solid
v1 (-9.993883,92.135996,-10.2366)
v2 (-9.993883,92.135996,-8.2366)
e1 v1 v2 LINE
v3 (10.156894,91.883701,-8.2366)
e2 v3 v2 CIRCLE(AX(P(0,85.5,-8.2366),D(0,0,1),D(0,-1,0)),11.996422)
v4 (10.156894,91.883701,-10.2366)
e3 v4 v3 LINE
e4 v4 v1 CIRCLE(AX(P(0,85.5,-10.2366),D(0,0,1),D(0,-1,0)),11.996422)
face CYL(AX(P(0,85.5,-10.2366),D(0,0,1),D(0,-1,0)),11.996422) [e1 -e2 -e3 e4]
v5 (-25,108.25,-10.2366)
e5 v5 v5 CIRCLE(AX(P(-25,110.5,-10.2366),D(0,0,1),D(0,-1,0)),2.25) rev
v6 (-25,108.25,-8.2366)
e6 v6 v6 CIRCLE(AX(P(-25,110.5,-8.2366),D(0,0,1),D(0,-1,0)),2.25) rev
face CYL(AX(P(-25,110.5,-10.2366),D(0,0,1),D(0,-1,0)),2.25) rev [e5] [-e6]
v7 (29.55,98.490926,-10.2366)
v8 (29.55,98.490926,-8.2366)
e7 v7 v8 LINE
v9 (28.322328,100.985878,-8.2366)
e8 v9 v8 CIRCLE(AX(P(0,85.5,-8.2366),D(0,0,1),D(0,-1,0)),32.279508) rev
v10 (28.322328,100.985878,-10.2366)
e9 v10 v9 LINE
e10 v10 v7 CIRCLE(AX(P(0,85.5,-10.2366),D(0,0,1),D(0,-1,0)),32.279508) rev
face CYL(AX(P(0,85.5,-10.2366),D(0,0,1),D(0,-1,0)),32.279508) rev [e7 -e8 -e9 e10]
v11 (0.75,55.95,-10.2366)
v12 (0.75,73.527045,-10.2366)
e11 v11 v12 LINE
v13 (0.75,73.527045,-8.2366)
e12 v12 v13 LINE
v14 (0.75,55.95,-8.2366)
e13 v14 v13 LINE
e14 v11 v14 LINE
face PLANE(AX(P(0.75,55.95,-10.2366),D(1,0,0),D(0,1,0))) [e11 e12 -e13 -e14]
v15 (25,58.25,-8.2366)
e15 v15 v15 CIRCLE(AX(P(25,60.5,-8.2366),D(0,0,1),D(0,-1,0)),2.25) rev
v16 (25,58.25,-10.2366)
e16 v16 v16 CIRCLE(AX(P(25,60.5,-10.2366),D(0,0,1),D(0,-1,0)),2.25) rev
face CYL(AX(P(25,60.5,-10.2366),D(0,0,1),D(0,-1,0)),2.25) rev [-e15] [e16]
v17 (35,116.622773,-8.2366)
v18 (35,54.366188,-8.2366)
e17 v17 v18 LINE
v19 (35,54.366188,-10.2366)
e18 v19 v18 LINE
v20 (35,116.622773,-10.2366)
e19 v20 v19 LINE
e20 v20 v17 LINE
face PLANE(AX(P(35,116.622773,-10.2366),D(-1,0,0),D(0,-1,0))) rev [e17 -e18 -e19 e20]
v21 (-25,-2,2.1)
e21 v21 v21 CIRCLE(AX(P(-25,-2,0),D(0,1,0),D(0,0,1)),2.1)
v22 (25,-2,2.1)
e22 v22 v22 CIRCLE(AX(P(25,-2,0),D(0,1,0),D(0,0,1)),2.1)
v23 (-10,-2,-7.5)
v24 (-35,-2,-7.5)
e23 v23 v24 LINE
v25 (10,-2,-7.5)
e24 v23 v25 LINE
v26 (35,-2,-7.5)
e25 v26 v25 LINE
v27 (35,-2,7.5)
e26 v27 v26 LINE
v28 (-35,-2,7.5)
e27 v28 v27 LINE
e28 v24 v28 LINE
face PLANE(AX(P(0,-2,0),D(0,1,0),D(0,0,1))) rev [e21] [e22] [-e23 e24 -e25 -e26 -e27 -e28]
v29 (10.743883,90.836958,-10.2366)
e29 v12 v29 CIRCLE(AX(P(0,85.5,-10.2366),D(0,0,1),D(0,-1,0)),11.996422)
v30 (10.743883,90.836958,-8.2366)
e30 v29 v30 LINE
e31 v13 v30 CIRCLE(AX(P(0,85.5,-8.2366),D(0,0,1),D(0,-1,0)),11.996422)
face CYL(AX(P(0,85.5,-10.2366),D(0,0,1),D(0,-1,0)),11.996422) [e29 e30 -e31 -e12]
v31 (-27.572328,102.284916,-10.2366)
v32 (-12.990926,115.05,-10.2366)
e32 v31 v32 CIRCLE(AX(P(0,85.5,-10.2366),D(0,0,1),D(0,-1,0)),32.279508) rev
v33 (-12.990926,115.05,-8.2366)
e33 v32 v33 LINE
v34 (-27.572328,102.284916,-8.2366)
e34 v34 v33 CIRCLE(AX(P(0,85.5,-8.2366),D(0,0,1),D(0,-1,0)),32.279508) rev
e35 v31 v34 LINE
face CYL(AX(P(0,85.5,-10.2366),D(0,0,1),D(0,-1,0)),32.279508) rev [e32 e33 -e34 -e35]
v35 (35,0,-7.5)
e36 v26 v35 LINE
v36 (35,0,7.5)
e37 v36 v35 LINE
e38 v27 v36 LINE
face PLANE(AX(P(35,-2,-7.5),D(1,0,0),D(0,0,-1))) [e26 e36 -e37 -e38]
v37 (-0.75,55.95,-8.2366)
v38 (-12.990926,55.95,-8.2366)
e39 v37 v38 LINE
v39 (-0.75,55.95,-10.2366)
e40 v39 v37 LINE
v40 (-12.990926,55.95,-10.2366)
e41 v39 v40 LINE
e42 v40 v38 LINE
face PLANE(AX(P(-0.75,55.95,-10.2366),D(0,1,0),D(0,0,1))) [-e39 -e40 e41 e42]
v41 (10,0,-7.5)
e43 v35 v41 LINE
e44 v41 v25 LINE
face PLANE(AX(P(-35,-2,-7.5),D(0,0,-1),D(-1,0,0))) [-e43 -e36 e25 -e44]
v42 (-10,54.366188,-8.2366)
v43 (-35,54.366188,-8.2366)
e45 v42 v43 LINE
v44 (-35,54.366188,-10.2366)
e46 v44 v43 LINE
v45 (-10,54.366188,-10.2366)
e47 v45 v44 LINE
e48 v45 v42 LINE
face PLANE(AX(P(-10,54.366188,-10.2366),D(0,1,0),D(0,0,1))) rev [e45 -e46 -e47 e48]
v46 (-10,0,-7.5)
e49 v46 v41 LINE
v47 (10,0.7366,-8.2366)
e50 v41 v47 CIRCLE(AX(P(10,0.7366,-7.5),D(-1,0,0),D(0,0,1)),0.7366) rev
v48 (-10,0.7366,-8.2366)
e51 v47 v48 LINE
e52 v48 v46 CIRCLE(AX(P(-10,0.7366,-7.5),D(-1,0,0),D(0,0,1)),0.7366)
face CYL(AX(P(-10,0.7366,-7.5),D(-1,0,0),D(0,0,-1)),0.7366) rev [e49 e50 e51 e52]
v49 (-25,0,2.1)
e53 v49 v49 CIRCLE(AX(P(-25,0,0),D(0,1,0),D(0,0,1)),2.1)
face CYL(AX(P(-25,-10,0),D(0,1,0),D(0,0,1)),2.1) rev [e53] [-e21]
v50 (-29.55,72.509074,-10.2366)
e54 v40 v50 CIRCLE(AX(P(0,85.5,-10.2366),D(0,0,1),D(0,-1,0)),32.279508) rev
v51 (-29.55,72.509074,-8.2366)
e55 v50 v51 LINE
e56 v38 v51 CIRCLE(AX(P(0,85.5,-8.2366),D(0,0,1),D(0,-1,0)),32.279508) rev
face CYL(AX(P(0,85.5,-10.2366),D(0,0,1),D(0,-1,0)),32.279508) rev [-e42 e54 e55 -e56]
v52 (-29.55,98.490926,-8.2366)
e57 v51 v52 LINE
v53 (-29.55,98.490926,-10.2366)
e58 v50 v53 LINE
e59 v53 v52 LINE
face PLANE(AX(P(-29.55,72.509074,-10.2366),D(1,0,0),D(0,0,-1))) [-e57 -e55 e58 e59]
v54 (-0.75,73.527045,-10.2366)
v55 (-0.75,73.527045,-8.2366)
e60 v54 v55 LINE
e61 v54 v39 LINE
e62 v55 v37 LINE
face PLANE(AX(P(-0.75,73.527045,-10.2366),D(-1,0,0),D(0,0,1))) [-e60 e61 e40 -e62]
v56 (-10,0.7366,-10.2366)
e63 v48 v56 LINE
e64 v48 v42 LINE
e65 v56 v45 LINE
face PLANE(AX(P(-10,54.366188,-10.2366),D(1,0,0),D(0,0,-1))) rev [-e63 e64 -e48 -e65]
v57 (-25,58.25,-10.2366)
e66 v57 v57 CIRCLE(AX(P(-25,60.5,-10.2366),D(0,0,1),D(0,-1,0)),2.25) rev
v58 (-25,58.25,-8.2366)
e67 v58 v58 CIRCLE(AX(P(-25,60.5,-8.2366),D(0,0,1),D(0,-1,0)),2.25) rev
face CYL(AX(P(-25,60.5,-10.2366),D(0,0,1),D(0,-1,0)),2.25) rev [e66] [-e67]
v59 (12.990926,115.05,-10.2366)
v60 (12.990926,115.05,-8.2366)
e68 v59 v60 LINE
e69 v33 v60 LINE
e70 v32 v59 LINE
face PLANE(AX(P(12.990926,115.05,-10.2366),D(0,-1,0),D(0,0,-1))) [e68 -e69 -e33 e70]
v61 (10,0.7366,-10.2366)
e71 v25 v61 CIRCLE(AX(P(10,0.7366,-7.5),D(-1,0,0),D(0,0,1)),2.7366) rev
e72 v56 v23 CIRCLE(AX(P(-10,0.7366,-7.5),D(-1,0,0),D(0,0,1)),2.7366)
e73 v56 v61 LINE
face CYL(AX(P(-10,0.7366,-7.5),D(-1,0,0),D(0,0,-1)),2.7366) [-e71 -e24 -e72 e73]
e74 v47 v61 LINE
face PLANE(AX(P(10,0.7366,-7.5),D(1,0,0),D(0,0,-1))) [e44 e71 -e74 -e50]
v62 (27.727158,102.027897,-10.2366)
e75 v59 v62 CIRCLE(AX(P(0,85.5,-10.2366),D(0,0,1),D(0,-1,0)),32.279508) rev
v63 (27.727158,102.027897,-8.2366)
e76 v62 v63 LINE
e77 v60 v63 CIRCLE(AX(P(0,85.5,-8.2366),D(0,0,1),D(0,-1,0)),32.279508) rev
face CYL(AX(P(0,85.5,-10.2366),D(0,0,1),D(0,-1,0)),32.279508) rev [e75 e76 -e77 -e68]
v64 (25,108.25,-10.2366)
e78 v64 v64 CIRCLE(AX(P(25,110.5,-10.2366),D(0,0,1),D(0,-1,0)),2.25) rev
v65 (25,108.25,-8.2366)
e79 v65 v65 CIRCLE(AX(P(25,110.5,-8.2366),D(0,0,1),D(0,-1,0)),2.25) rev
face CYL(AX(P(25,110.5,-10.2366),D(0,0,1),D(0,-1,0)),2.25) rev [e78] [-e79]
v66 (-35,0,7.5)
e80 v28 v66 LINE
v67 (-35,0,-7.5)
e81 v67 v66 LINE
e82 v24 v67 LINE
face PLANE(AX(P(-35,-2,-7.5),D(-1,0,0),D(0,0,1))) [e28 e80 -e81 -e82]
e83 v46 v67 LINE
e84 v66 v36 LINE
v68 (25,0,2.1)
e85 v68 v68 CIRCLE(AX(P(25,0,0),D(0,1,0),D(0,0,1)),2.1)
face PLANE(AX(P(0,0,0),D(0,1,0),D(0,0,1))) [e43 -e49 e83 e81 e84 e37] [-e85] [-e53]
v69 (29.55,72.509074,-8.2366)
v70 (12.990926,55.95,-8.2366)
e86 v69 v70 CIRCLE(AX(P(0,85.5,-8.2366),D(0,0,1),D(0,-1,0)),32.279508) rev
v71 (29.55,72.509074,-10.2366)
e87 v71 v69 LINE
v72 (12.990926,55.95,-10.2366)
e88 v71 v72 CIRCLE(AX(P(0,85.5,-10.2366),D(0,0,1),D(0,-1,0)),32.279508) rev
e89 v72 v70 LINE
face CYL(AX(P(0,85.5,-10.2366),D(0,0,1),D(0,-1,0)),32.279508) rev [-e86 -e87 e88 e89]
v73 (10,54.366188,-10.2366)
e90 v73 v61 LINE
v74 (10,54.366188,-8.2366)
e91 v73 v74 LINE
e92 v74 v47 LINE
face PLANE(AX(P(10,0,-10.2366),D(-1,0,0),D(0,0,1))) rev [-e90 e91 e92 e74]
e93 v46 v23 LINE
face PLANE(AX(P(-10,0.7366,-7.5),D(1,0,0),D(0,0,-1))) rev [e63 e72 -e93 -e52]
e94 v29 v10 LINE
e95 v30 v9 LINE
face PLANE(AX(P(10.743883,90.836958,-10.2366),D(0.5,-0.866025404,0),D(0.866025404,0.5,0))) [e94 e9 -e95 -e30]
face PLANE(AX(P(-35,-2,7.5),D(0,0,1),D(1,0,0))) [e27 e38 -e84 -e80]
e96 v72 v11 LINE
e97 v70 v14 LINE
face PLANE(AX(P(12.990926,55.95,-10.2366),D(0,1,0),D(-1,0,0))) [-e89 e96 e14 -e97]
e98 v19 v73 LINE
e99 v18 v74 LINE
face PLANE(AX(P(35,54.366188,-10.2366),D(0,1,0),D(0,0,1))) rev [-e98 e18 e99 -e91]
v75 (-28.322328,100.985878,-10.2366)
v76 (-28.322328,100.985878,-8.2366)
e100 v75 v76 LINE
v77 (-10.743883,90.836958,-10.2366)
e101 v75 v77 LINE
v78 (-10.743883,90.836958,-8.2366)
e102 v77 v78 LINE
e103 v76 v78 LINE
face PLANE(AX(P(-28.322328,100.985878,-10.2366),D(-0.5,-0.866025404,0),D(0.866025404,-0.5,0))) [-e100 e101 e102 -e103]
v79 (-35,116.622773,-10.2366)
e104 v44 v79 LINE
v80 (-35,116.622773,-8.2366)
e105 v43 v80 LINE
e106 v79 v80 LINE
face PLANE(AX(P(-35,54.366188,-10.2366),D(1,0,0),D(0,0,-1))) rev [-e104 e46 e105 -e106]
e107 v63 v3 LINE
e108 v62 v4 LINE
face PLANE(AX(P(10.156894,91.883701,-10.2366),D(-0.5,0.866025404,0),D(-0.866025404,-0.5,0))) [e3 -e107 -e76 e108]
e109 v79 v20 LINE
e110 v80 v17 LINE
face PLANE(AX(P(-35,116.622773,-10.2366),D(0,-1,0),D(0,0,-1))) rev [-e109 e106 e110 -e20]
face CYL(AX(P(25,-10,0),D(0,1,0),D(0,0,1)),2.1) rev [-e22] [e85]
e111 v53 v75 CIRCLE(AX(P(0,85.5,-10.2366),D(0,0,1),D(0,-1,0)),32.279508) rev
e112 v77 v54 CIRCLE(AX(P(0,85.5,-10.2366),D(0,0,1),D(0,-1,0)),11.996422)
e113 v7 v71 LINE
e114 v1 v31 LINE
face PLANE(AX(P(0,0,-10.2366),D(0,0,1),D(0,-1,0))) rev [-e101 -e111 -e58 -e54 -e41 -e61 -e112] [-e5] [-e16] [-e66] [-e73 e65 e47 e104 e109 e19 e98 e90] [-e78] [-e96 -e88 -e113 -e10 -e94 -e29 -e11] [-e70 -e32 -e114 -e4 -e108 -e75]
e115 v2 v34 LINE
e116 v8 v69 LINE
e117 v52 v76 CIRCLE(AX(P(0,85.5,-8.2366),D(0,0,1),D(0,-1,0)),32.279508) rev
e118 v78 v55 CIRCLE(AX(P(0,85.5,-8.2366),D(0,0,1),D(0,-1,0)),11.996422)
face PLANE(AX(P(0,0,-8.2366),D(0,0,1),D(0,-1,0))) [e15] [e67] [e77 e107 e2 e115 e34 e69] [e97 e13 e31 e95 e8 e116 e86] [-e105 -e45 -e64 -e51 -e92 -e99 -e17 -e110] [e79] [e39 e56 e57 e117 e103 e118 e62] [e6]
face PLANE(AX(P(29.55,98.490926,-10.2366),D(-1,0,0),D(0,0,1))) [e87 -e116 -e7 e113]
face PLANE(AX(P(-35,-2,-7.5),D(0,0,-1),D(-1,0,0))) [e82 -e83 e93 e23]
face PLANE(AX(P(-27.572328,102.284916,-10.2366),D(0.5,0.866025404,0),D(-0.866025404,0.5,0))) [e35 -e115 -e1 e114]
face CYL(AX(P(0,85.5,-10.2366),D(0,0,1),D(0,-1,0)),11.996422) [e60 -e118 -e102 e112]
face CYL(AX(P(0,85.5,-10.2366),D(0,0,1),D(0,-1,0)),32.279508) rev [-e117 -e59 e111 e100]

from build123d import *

# Parameters (mm, degrees)
SKETCH1_W               = 70
SKETCH1_H               = 15
BASE_FLANGE1_DEPTH      = 2
EDGE_FLANGE1_DEPTH      = 20
EDGE_FLANGE1_START      = 2
EDGE_FLANGE1_PROFILE_R  = 2.25
EDGE_FLANGE1_FLAT_DEPTH = 2
SKETCH18_R              = 2.1
CUT_EXTRUDE1_DEPTH      = 10


# Sheet-metal steps are written as plain solids
with BuildPart() as part:
    # Sketch1 → Base-Flange1 (new body)
    with BuildSketch(Plane(origin=(0, 0, 0), x_dir=(1, 0, 0), z_dir=(0, 1, 0))):
        Rectangle(SKETCH1_W, SKETCH1_H)
    extrude(amount=-BASE_FLANGE1_DEPTH)

    # Edge-Flange1 bend section (across the edge) → Edge-Flange1 (add)
    with BuildSketch(Plane(origin=(10, 0, -8.2366), x_dir=(0, 0, 1), z_dir=(-1, 0, 0))):
        with BuildLine():
            Line((-2, 0.7366), (0, 0.7366))
            ThreePointArc((0, 0.7366), (0.215745145, 0.215745145), (0.7366, 0))
            Line((0.7366, 0), (0.7366, -2))
            ThreePointArc((0.7366, -2), (-1.198468417, -1.198468417), (-2, 0.7366))
        make_face()
    extrude(amount=EDGE_FLANGE1_DEPTH)

    # Edge-Flange1 profile (on flange) → Edge-Flange1 flat (add)
    with BuildSketch(Plane(origin=(0, 0, -8.2366), x_dir=(-1, 0, 0), z_dir=(0, 0, -1)).offset(EDGE_FLANGE1_START)):
        Polygon((-10, 0.7366), (10, 0.7366), (10, 54.366187709), (35, 54.366187709), (35, 116.622772523), (-35, 116.622772523), (-35, 54.366187709), (-10, 54.366187709), align=None)
        with Locations((25, 60.5)):
            Circle(EDGE_FLANGE1_PROFILE_R, mode=Mode.SUBTRACT)
        with BuildLine():
            Line((29.55, 98.490926284), (29.55, 72.509073716))
            ThreePointArc((29.55, 72.509073716), (22.825059318, 62.674940682), (12.990926284, 55.95))
            Line((12.990926284, 55.95), (0.75, 55.95))
            Line((0.75, 55.95), (0.75, 73.527045436))
            ThreePointArc((0.75, 73.527045436), (10.389206213, 79.501788996), (10.74388281, 90.836958229))
            Line((10.74388281, 90.836958229), (28.322327677, 100.985878105))
            ThreePointArc((28.322327677, 100.985878105), (28.963041516, 99.751627692), (29.55, 98.490926284))
        make_face(mode=Mode.SUBTRACT)
        with Locations((-25, 60.5)):
            Circle(EDGE_FLANGE1_PROFILE_R, mode=Mode.SUBTRACT)
        with BuildLine():
            Line((-0.75, 55.95), (-12.990926284, 55.95))
            ThreePointArc((-12.990926284, 55.95), (-22.825059318, 62.674940682), (-29.55, 72.509073716))
            Line((-29.55, 72.509073716), (-29.55, 98.490926284))
            ThreePointArc((-29.55, 98.490926284), (-28.963041516, 99.751627692), (-28.322327677, 100.985878105))
            Line((-28.322327677, 100.985878105), (-10.74388281, 90.836958229))
            ThreePointArc((-10.74388281, 90.836958229), (-10.389206213, 79.501788996), (-0.75, 73.527045436))
            Line((-0.75, 73.527045436), (-0.75, 55.95))
        make_face(mode=Mode.SUBTRACT)
        with Locations((25, 110.5)):
            Circle(EDGE_FLANGE1_PROFILE_R, mode=Mode.SUBTRACT)
        with BuildLine():
            Line((-10.156894371, 91.883700942), (-27.727157775, 102.027897248))
            ThreePointArc((-27.727157775, 102.027897248), (-21.374853973, 109.688474184), (-12.990926284, 115.05))
            Line((-12.990926284, 115.05), (12.990926284, 115.05))
            ThreePointArc((12.990926284, 115.05), (21.262202003, 109.787557137), (27.572327677, 102.28491621))
            Line((27.572327677, 102.28491621), (9.99388281, 92.135996335))
            ThreePointArc((9.99388281, 92.135996335), (-0.150187994, 97.495481839), (-10.156894371, 91.883700942))
        make_face(mode=Mode.SUBTRACT)
        with Locations((-25, 110.5)):
            Circle(EDGE_FLANGE1_PROFILE_R, mode=Mode.SUBTRACT)
    extrude(amount=-EDGE_FLANGE1_FLAT_DEPTH)

    # Sketch18 → Cut-Extrude1 (cut)
    with BuildSketch(Plane(origin=(0, 0, 0), x_dir=(1, 0, 0), z_dir=(0, 1, 0))):
        with Locations(Location((-25, 0, 0), (0, 0, 270))):
            Circle(SKETCH18_R)
        with Locations(Location((25, 0, 0), (0, 0, 270))):
            Circle(SKETCH18_R)
    extrude(amount=-CUT_EXTRUDE1_DEPTH, mode=Mode.SUBTRACT)


solid = part.part
